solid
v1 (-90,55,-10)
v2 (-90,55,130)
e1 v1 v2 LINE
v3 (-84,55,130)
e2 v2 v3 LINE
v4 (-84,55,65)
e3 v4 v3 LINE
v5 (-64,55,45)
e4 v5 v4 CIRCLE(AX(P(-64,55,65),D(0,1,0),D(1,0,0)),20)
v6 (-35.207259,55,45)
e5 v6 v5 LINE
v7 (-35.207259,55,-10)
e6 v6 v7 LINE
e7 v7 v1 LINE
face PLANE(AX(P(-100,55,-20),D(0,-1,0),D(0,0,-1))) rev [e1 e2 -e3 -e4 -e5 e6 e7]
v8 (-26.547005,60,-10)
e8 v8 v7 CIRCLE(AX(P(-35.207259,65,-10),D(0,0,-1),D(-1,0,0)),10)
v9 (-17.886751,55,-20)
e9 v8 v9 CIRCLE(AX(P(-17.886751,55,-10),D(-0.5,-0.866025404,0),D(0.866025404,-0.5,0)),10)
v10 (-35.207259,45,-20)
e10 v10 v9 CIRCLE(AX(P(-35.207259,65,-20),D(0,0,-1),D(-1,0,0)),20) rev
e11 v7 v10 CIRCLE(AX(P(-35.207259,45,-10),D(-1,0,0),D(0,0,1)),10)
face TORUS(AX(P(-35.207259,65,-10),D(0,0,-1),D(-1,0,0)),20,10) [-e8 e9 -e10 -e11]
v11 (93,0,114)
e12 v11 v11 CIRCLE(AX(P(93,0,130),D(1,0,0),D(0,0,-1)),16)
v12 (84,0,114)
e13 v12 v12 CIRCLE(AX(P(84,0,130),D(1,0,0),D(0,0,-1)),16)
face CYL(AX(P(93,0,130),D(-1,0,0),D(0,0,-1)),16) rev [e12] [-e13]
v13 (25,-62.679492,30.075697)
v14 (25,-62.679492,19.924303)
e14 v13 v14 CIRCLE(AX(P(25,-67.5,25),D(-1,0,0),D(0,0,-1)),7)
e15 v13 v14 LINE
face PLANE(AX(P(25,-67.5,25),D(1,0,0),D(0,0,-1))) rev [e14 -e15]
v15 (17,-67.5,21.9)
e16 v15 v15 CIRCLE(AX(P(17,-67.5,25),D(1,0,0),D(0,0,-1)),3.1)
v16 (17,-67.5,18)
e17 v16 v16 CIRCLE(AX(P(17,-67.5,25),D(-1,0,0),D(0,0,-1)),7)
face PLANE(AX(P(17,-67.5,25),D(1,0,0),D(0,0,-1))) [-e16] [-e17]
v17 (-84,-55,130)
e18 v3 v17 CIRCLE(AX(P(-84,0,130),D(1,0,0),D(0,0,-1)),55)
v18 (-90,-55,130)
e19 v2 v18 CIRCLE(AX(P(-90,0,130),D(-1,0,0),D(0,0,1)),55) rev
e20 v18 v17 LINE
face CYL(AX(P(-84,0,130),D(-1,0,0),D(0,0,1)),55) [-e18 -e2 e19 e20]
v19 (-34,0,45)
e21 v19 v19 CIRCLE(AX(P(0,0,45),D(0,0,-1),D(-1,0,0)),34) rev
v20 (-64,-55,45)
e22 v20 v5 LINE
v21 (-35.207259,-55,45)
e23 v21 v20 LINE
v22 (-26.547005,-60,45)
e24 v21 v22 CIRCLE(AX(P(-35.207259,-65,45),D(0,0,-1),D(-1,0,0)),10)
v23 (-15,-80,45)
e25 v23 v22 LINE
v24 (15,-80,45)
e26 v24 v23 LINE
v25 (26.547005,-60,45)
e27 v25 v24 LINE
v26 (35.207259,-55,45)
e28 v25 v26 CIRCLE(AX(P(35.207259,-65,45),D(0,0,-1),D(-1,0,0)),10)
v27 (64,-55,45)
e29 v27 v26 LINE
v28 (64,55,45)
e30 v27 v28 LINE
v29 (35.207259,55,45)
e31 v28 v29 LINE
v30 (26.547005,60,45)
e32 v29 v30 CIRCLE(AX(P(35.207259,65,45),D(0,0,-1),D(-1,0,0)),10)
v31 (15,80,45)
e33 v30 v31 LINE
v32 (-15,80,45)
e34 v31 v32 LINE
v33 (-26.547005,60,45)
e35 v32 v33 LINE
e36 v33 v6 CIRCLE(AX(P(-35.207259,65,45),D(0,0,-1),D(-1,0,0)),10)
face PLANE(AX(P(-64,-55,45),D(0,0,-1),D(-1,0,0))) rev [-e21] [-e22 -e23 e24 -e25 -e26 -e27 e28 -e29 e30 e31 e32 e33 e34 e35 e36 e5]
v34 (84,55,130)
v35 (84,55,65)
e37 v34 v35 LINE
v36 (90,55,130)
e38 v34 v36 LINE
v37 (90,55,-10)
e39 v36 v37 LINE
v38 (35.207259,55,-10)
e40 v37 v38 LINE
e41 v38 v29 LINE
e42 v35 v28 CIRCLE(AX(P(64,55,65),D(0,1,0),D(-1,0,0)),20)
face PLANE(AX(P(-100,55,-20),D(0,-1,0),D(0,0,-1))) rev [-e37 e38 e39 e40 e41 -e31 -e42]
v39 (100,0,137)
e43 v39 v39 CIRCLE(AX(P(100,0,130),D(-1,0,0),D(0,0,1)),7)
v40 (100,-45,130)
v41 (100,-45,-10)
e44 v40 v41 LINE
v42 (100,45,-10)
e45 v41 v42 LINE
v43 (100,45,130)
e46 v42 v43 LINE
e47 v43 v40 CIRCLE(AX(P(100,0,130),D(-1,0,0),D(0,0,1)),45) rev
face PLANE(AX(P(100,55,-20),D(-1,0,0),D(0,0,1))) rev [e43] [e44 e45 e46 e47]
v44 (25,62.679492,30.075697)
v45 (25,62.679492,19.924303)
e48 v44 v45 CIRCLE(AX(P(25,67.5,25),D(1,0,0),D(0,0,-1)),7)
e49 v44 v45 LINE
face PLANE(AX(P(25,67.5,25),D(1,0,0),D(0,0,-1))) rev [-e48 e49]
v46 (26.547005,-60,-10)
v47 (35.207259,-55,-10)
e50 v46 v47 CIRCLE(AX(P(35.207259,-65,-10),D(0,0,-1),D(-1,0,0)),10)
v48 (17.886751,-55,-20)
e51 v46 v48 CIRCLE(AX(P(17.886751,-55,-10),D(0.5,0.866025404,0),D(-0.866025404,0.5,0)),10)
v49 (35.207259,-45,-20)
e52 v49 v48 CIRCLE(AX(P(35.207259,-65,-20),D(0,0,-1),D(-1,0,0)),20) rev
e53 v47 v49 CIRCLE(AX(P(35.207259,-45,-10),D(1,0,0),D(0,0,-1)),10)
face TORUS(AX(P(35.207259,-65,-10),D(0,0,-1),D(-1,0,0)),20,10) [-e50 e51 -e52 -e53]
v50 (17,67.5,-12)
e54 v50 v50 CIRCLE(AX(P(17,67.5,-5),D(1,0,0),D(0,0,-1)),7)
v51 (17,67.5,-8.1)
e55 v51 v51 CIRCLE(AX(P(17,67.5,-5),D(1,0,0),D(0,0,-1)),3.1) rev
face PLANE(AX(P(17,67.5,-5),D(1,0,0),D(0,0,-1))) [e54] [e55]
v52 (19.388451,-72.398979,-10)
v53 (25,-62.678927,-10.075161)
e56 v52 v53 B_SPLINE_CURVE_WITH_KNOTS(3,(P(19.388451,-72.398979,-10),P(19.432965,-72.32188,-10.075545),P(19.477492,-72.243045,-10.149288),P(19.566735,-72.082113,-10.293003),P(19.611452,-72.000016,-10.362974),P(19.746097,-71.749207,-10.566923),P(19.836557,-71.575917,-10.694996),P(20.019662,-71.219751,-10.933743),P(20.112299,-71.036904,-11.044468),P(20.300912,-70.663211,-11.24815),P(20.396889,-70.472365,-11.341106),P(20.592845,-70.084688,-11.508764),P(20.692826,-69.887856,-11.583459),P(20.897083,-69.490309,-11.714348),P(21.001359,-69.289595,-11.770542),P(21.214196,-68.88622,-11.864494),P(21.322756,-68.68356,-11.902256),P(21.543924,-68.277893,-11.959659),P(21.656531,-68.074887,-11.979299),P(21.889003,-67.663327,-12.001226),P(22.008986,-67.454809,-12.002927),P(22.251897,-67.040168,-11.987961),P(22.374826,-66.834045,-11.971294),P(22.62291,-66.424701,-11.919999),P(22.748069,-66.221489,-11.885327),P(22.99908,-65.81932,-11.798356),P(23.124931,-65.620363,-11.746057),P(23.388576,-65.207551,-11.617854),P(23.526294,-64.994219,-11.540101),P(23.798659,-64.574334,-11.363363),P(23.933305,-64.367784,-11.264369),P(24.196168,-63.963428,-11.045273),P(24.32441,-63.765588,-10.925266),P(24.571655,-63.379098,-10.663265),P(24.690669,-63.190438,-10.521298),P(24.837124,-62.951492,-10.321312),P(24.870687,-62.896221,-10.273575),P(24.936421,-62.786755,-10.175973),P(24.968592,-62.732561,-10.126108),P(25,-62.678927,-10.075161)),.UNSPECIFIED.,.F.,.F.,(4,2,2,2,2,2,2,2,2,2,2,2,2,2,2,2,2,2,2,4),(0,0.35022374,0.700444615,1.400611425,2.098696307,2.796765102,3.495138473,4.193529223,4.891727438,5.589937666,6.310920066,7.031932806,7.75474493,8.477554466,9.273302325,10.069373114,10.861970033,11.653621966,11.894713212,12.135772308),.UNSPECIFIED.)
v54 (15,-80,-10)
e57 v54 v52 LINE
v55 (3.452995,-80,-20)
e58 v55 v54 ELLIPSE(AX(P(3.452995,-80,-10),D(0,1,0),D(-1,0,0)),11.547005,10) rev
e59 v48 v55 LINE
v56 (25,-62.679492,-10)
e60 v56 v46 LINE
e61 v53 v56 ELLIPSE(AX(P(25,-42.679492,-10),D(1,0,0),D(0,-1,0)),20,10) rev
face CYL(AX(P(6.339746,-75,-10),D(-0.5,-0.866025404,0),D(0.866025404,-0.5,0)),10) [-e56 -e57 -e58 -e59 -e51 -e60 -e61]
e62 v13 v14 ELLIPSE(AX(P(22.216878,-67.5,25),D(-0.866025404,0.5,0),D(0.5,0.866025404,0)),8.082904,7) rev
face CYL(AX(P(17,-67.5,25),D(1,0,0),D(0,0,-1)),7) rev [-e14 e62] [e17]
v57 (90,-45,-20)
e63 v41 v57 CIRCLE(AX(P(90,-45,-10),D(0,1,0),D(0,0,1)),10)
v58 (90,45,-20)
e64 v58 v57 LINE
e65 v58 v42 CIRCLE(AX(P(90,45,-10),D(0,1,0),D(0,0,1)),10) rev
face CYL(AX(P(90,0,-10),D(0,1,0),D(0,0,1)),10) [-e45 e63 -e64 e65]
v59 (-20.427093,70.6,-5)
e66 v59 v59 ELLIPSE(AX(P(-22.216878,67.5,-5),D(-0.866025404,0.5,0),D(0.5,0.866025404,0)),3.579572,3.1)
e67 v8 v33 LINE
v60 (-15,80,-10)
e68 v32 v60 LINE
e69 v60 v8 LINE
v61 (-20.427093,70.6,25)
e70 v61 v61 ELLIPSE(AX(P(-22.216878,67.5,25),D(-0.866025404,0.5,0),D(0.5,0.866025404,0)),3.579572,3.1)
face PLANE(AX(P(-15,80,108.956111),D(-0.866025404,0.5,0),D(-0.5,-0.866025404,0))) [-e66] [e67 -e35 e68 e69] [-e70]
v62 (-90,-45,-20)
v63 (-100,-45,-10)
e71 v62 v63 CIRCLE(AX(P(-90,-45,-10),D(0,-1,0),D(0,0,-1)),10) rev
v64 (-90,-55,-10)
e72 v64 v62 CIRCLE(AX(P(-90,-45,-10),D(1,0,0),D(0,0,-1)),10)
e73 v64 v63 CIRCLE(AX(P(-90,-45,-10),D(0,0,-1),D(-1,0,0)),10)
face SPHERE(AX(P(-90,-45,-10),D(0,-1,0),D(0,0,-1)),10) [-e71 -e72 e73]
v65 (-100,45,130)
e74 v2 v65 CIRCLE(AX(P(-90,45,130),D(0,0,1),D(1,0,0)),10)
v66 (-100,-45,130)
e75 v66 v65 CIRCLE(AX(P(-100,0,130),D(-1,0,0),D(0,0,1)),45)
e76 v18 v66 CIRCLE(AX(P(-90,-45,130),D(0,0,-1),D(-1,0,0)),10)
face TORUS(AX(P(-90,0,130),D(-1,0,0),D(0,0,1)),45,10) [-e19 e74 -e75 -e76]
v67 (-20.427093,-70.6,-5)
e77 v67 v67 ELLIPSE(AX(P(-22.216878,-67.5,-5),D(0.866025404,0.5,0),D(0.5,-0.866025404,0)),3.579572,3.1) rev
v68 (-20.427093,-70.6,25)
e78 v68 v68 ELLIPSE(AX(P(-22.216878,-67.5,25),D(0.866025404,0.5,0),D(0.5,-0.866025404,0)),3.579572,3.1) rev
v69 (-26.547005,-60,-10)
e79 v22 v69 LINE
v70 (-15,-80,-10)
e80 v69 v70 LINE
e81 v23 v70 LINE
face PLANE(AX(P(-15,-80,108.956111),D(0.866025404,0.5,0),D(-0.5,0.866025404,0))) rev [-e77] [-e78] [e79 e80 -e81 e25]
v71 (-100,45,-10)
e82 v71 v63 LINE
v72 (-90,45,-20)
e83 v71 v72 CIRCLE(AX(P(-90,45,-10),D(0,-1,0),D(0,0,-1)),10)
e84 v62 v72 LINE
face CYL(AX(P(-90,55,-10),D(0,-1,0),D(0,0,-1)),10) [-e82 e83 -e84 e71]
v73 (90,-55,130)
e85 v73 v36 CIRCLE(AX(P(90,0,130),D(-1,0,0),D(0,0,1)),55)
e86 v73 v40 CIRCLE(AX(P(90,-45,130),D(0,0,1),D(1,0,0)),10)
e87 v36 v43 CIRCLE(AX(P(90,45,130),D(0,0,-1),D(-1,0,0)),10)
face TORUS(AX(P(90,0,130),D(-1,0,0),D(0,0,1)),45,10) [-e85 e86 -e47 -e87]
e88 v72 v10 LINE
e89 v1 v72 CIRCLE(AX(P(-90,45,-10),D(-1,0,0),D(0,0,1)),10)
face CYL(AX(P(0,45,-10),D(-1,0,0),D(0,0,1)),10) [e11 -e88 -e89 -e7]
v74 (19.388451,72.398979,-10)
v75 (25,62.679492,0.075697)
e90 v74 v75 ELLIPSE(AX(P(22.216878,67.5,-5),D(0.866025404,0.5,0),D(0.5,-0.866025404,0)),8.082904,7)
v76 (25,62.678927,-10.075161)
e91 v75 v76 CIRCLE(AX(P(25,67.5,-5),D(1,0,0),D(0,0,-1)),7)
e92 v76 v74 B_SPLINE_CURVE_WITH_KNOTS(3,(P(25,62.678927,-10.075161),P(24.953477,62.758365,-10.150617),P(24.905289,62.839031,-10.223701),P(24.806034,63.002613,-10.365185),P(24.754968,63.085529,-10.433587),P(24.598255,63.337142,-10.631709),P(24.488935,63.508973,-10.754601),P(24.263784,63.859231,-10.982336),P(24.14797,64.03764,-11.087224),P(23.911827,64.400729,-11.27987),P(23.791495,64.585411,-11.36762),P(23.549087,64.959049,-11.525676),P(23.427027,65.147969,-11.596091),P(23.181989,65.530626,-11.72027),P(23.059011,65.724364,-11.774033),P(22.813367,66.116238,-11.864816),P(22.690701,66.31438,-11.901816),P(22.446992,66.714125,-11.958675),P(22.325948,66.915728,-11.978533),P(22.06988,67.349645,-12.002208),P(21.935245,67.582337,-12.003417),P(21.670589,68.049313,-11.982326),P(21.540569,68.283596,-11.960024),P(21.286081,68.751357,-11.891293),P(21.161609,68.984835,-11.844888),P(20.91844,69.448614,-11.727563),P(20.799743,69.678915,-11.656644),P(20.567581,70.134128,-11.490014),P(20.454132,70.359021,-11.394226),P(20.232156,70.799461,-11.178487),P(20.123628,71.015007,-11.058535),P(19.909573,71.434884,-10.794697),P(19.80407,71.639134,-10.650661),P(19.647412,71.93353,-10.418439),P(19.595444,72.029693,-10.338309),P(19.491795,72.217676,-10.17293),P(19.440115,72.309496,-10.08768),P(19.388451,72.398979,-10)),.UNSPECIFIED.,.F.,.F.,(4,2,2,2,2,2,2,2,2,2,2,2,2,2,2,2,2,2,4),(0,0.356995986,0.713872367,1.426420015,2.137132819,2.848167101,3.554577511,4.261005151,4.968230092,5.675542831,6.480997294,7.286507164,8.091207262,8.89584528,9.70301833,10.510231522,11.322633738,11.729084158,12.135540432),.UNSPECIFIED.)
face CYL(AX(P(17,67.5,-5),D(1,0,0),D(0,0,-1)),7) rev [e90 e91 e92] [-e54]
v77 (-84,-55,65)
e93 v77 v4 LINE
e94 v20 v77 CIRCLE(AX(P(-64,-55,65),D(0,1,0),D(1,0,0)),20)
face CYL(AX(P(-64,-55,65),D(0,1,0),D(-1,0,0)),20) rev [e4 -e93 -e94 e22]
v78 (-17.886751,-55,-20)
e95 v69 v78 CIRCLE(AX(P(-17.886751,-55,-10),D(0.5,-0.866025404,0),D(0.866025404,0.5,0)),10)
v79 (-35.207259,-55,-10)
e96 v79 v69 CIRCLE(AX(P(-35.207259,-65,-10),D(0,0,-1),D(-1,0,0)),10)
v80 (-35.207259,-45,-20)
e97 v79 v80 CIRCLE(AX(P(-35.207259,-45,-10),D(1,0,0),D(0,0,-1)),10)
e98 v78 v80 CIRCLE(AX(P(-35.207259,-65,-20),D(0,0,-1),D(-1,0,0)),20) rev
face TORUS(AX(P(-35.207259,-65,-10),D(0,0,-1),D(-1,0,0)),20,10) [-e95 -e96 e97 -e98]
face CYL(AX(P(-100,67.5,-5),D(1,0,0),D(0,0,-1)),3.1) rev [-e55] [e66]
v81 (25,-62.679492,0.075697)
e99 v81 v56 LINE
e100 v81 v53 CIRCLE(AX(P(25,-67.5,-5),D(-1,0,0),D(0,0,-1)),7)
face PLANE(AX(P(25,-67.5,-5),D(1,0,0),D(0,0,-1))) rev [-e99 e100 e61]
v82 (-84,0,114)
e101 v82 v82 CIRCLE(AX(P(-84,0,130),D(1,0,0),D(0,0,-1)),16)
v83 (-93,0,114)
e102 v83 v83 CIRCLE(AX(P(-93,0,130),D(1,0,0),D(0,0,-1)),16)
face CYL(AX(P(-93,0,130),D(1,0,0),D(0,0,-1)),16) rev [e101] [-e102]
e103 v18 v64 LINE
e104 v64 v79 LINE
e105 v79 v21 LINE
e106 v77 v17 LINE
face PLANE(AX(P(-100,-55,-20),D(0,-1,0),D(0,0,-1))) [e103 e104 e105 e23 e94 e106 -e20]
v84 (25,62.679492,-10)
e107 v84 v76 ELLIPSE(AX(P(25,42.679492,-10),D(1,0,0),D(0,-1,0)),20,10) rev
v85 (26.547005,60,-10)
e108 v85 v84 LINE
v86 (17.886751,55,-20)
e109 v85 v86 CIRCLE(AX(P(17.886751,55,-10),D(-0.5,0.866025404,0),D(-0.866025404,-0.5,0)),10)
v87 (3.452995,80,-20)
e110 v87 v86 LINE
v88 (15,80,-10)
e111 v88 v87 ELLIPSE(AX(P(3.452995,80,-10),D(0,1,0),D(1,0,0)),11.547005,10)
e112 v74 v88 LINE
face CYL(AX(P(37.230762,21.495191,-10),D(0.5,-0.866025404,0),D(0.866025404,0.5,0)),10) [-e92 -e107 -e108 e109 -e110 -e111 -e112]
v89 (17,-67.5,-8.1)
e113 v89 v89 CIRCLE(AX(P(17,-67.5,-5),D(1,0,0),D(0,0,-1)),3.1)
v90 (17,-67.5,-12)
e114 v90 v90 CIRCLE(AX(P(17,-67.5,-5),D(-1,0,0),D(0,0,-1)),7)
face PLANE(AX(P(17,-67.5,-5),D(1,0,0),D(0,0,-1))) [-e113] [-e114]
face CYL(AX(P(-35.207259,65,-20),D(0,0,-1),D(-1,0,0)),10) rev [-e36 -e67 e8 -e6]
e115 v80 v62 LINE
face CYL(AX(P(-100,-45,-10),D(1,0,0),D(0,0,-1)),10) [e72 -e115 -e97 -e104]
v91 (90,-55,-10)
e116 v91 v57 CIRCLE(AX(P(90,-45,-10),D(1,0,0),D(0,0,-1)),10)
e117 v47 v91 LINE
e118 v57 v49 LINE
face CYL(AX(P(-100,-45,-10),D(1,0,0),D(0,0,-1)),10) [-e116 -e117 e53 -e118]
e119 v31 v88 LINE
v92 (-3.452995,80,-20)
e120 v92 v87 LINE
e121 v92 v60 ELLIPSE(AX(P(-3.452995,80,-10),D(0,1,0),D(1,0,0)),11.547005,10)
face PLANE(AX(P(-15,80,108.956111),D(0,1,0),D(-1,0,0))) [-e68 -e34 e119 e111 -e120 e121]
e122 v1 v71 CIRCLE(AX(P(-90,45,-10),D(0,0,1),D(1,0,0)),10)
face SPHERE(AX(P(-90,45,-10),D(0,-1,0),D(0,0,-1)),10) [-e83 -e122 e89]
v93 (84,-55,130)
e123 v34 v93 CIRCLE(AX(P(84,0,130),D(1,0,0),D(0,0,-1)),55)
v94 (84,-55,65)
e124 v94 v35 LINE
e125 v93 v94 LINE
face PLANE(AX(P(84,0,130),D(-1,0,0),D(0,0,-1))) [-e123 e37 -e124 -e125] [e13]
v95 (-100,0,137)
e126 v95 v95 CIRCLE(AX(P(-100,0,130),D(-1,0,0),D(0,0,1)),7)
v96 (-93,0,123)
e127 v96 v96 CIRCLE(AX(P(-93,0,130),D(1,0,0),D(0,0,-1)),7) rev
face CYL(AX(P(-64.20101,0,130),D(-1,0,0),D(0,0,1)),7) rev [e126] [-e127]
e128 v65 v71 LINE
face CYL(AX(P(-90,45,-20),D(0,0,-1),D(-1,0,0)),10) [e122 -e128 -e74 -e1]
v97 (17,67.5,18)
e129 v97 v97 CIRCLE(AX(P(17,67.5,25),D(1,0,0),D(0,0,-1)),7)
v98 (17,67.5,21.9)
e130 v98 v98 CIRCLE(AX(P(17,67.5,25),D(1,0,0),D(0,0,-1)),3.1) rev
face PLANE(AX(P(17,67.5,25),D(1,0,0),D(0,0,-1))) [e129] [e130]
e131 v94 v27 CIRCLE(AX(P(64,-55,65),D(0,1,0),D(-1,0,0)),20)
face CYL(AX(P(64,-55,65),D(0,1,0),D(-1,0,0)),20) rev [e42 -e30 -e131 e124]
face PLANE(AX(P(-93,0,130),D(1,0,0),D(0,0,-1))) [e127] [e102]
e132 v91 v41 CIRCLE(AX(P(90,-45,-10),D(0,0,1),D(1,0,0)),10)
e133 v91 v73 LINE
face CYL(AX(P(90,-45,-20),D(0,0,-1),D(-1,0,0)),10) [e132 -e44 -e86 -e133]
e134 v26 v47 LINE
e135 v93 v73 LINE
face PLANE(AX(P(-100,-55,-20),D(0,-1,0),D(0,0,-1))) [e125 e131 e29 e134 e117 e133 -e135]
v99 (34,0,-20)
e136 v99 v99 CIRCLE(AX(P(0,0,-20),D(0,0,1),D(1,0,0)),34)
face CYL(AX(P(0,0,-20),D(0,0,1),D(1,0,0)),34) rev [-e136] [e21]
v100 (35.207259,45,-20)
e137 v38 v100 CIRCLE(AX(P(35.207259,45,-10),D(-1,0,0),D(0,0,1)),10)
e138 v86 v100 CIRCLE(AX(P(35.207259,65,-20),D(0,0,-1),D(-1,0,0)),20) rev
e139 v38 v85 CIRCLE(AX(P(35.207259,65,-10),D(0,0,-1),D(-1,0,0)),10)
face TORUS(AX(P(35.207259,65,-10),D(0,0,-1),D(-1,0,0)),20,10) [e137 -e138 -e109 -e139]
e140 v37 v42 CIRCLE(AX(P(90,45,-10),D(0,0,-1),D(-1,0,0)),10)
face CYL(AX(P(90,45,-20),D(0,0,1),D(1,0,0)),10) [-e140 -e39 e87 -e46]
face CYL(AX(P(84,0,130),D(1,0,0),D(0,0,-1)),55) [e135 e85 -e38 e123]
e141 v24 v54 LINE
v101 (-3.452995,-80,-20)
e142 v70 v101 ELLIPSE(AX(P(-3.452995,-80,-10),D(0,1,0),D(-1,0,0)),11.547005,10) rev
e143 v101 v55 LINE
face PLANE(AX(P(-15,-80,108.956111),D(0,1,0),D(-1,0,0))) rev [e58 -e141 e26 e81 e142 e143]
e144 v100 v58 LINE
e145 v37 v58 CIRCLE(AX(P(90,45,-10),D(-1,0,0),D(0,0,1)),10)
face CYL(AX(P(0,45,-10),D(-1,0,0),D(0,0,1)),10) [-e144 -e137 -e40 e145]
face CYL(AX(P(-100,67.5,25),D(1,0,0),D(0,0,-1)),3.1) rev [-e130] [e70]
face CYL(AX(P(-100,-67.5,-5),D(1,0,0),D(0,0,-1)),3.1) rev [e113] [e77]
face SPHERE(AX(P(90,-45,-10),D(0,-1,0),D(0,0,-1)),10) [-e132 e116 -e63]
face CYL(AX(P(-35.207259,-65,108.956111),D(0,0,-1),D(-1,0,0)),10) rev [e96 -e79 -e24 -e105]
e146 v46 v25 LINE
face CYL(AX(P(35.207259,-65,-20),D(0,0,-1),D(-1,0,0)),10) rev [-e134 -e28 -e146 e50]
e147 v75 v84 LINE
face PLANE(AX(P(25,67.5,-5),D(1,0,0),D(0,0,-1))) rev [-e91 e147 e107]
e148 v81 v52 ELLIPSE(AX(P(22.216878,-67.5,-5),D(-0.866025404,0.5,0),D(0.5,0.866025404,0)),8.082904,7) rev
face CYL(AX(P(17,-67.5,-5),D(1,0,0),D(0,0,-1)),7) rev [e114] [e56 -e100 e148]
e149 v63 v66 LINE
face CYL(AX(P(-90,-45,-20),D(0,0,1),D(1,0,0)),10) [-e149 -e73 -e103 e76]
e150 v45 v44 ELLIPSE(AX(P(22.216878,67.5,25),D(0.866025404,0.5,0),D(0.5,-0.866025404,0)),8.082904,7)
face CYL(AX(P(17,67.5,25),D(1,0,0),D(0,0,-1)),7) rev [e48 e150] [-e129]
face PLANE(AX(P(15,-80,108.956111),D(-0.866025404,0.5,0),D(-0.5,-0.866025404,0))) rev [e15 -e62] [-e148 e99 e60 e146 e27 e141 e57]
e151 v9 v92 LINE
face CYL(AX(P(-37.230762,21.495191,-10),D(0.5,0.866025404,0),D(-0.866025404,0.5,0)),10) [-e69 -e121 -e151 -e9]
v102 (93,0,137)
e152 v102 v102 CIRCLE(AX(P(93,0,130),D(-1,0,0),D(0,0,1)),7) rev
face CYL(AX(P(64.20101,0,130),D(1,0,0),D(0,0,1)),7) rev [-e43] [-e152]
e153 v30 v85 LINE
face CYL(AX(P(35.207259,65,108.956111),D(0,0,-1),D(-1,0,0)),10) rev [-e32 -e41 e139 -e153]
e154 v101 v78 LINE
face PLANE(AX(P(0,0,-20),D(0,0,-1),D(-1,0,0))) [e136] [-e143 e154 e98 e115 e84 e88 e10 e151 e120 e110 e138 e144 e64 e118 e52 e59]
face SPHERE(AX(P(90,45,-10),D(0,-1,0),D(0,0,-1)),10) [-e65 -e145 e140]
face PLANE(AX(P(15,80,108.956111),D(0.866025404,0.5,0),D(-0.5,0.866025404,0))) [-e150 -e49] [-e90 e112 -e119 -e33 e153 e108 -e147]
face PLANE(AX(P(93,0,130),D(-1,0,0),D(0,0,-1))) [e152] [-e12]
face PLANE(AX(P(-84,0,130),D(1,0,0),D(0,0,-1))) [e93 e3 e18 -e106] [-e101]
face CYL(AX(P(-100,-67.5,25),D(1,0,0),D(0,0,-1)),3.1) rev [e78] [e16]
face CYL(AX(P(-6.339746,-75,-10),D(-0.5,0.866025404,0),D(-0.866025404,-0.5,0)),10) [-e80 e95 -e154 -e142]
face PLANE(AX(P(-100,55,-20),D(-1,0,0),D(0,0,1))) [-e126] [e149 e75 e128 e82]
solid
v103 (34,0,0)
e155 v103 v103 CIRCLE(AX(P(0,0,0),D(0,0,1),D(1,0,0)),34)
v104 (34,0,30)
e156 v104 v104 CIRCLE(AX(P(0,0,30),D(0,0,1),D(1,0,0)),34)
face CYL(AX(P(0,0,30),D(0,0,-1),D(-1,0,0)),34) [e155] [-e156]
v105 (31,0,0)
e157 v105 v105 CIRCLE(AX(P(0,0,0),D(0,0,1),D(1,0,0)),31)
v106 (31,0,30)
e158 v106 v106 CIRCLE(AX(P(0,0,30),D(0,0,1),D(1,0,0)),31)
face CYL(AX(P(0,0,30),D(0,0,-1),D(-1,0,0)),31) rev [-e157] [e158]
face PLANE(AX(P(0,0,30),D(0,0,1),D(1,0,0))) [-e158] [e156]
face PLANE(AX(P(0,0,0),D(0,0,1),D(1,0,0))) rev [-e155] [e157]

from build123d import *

# Parameters (mm, degrees)
SKETCH1_R                 = 34
SKETCH1_R_2               = 31
CENTRE_HOLE_FOR_L2_DEPTH  = 30
MAIN_STRUCTURE_DEPTH      = 100
MAIN_STRUCTURE_DEPTH_BACK = 50
SKETCH2_W                 = 200
SKETCH2_H                 = 110
SKETCH2_R                 = 34
BEARING_CURVE_DEPTH       = 16
SKETCH6_R                 = 7
CUT_EXTRUDE2_DEPTH        = 16
WRIST_CUTOUT_DEPTH        = 238.328885726
SKETCH9_R                 = 16
CUT_EXTRUDE3_DEPTH        = 9
FILLET2_R                 = 10
BOSS_EXTRUDE4_DEPTH       = 65
SKETCH11_R                = 3.1
CUT_EXTRUDE6_DEPTH        = 226
CUT_EXTRUDE8_START        = 25
SKETCH13_R                = 7
CUT_EXTRUDE8_DEPTH        = 8
FILLET3_R                 = 10
FILLET1_R                 = 10


with BuildPart() as part:
    # Sketch1 → Centre Hole for L2 (new body)
    with BuildSketch(Plane.XY):
        Circle(SKETCH1_R)
        Circle(SKETCH1_R_2, mode=Mode.SUBTRACT)
    extrude(amount=CENTRE_HOLE_FOR_L2_DEPTH)


with BuildPart() as body_2:
    # Sketch2 → Main Structure (new, two sides: drawn at the far end of the back side and taken through both)
    with BuildSketch(Plane.XY.offset(30).offset(-MAIN_STRUCTURE_DEPTH_BACK)):
        Rectangle(SKETCH2_W, SKETCH2_H)
        Circle(SKETCH2_R, mode=Mode.SUBTRACT)
    extrude(amount=MAIN_STRUCTURE_DEPTH + MAIN_STRUCTURE_DEPTH_BACK)

    # Sketch3 → Bearing Curve (add)
    with BuildSketch(Plane.ZY.offset(100)):
        with BuildLine():
            Line((130, 55), (130, -55))
            ThreePointArc((130, -55), (185, 0), (130, 55))
        make_face()
    bearing_curve = extrude(amount=-BEARING_CURVE_DEPTH)

    # Mirror7: Bearing Curve across plane
    add(bearing_curve.mirror(Plane(origin=(0, 0, 0), x_dir=(0, 0, 1), z_dir=(1, 0, 0))))

    # Sketch6 → Cut-Extrude2 (cut)
    with BuildSketch(Plane.ZY.offset(100)):
        with Locations((130, 0)):
            Circle(SKETCH6_R)
    cut_extrude2 = extrude(amount=-CUT_EXTRUDE2_DEPTH, mode=Mode.SUBTRACT)

    # Sketch4 → Wrist Cutout (cut, through all)
    with BuildSketch(Plane(origin=(0, 55, 0), x_dir=(1, 0, 0), z_dir=(0, 1, 0))):
        with BuildLine():
            Line((-84, -130), (-84, -65))
            ThreePointArc((-84, -65), (-78.142135624, -50.857864376), (-64, -45))
            Line((-64, -45), (64, -45))
            ThreePointArc((64, -45), (78.142135624, -50.857864376), (84, -65))
            Line((84, -65), (84, -130))
            Line((84, -130), (-84, -130))
        make_face()
    extrude(amount=-WRIST_CUTOUT_DEPTH, mode=Mode.SUBTRACT)

    # Sketch9 → Cut-Extrude3 (cut)
    with BuildSketch(Plane(origin=(-84, 0, 0), x_dir=(0, 0, -1), z_dir=(1, 0, 0))):
        with Locations((-130, 0)):
            Circle(SKETCH9_R)
    cut_extrude3 = extrude(amount=-CUT_EXTRUDE3_DEPTH, mode=Mode.SUBTRACT)

    # Mirror6: Cut-Extrude2, Cut-Extrude3 across plane
    add(cut_extrude2.mirror(Plane(origin=(0, 0, 0), x_dir=(0, 0, 1), z_dir=(1, 0, 0))), mode=Mode.SUBTRACT)
    add(cut_extrude3.mirror(Plane(origin=(0, 0, 0), x_dir=(0, 0, 1), z_dir=(1, 0, 0))), mode=Mode.SUBTRACT)

    # Fillet2
    fillet2_edges = [body_2.edges().sort_by_distance(p)[0] for p in [
        (-100, 0, -20),
        (100, 0, -20),
    ]]
    fillet(fillet2_edges, radius=FILLET2_R)

    # Sketch10 → Boss-Extrude4 (add)
    with BuildSketch(Plane(origin=(0, 0, -20), x_dir=(-1, 0, 0), z_dir=(0, 0, -1))):
        Polygon((15, 80), (-15, 80), (-29.43375673, 55), (29.43375673, 55), align=None)
    boss_extrude4 = extrude(amount=-BOSS_EXTRUDE4_DEPTH)

    # Sketch11 → Cut-Extrude6 (cut, symmetric)
    with BuildSketch(Plane(origin=(0, 0, 0), x_dir=(0, 0, -1), z_dir=(1, 0, 0))):
        with Locations(Location((5, 67.5, 0), (0, 0, 90))):
            Circle(SKETCH11_R)
        with Locations(Location((-25, 67.5, 0), (0, 0, 90))):
            Circle(SKETCH11_R)
    cut_extrude6 = extrude(amount=CUT_EXTRUDE6_DEPTH, both=True, mode=Mode.SUBTRACT)

    # Sketch13 → Cut-Extrude8 (cut)
    with BuildSketch(Plane(origin=(0, 0, 0), x_dir=(0, 0, -1), z_dir=(1, 0, 0)).offset(CUT_EXTRUDE8_START)):
        with Locations((5, 67.5)):
            Circle(SKETCH13_R)
        with Locations((-25, 67.5)):
            Circle(SKETCH13_R)
    cut_extrude8 = extrude(amount=-CUT_EXTRUDE8_DEPTH, mode=Mode.SUBTRACT)

    # Mirror8: Boss-Extrude4, Cut-Extrude6, Cut-Extrude8 across plane
    add(boss_extrude4.mirror(Plane.ZX))
    add(cut_extrude6.mirror(Plane.ZX), mode=Mode.SUBTRACT)
    add(cut_extrude8.mirror(Plane.ZX), mode=Mode.SUBTRACT)

    # Fillet3
    fillet3_edges = [body_2.edges().sort_by_distance(p)[0] for p in [
        (-29.43375673, 55, 12.5),
        (29.43375673, 55, 12.5),
        (29.43375673, -55, 12.5),
        (-29.43375673, -55, 12.5),
    ]]
    fillet(fillet3_edges, radius=FILLET3_R)

    # Fillet1
    # the kernel refuses this fillet: 10 mm, written as the material it takes off along each edge
    with BuildSketch(Plane(origin=(-100, 55, 130), x_dir=(1, 0, 0), z_dir=(0, 0, -1))) as fillet1_piece_1:
        with BuildLine():
            CenterArc((FILLET1_R, FILLET1_R), FILLET1_R, 180, 90)
            Line((0, FILLET1_R), (0, 0))
            Line((0, 0), (FILLET1_R, 0))
        make_face()
    extrude(amount=140, mode=Mode.SUBTRACT)
    with BuildSketch(Plane(origin=(-100, -55, -10), x_dir=(0, 1, 0), z_dir=(0, 0, 1)), Plane(origin=(100, -55, -10), x_dir=(-1, 0, 0), z_dir=(0, 0, 1)), Plane(origin=(100, 55, 130), x_dir=(-1, 0, 0), z_dir=(0, 0, -1))) as fillet1_piece_2:
        with BuildLine():
            CenterArc((FILLET1_R, -FILLET1_R), FILLET1_R, 90, 90)
            Line((0, -FILLET1_R), (0, 0))
            Line((0, 0), (FILLET1_R, 0))
        make_face()
    extrude(amount=140, mode=Mode.SUBTRACT)
    with BuildSketch(Plane(origin=(-100, 0, 130), x_dir=(0, -1, 0), z_dir=(0, 0, -1))) as fillet1_piece_3:
        with BuildLine():
            CenterArc((55 - FILLET1_R, -FILLET1_R), FILLET1_R, 0, 90)
            Line((55, -FILLET1_R), (55, 0))
            Line((55, 0), (55 - FILLET1_R, 0))
        make_face()
    revolve(axis=Axis((-100, 0, 130), (-1, 0, 0)), revolution_arc=180, mode=Mode.SUBTRACT)
    with BuildSketch(Plane(origin=(-26.547005384, -60, -20), x_dir=(0.8660254037844384, 0.5000000000000004, 0), z_dir=(0.5000000000000004, -0.8660254037844384, 0)), Plane(origin=(2.5, -101.650635095, -20), x_dir=(-0.8660254037844399, 0.49999999999999767, 0), z_dir=(0.4999999999999977, 0.86602540378444, 0))) as fillet1_piece_4:
        with BuildLine():
            CenterArc((FILLET1_R, FILLET1_R), FILLET1_R, 180, 90)
            Line((0, FILLET1_R), (0, 0))
            Line((0, 0), (FILLET1_R, 0))
        make_face()
    extrude(amount=48.094010768, mode=Mode.SUBTRACT)
    with BuildSketch(Plane(origin=(-35.207259422, -65, -20), x_dir=(0, 1, 0), z_dir=(-1, 0, 0))) as fillet1_piece_5:
        with BuildLine():
            CenterArc((10 + FILLET1_R, -FILLET1_R), FILLET1_R, 90, 90)
            Line((10, -FILLET1_R), (10, 0))
            Line((10, 0), (10 + FILLET1_R, 0))
        make_face()
    revolve(axis=Axis((-35.207259422, -65, -20), (0, 0, -1)), revolution_arc=60, mode=Mode.SUBTRACT)
    with BuildSketch(Plane(origin=(-90, -55, -20), x_dir=(0, 1, 0), z_dir=(1, 0, 0)), Plane(origin=(90, 55, -20), x_dir=(0, -1, 0), z_dir=(-1, 0, 0)), Plane(origin=(35.207259422, -55, -20), x_dir=(0, 1, 0), z_dir=(1, 0, 0))) as fillet1_piece_6:
        with BuildLine():
            CenterArc((FILLET1_R, FILLET1_R), FILLET1_R, 180, 90)
            Line((0, FILLET1_R), (0, 0))
            Line((0, 0), (FILLET1_R, 0))
        make_face()
    extrude(amount=54.792740578, mode=Mode.SUBTRACT)
    with BuildSketch(Plane(origin=(-90, -55, -10), x_dir=(-1, 0, 0), z_dir=(0, 0, 1))) as fillet1_piece_7:
        with BuildLine():
            CenterArc((10 - FILLET1_R, -FILLET1_R), FILLET1_R, 0, 90)
            Line((10 - FILLET1_R, 0), (10, 0))
            Line((10, 0), (10, -FILLET1_R))
        make_face()
    revolve(axis=Axis((-90, -55, -10), (0, -1, 0)), revolution_arc=90, mode=Mode.SUBTRACT)
    with BuildSketch(Plane(origin=(-26.547005384, 60, -20), x_dir=(0.8660254037844384, -0.5000000000000004, 0), z_dir=(0.5000000000000004, 0.8660254037844384, 0)), Plane(origin=(2.5, 101.650635095, -20), x_dir=(-0.8660254037844399, -0.49999999999999767, 0), z_dir=(0.4999999999999977, -0.86602540378444, 0))) as fillet1_piece_8:
        with BuildLine():
            CenterArc((FILLET1_R, -FILLET1_R), FILLET1_R, 90, 90)
            Line((0, -FILLET1_R), (0, 0))
            Line((0, 0), (FILLET1_R, 0))
        make_face()
    extrude(amount=48.094010768, mode=Mode.SUBTRACT)
    with BuildSketch(Plane(origin=(-35.207259422, 65, -20), x_dir=(0, -1, 0), z_dir=(-1, 0, 0))) as fillet1_piece_9:
        with BuildLine():
            CenterArc((10 + FILLET1_R, FILLET1_R), FILLET1_R, 180, 90)
            Line((10, FILLET1_R), (10, 0))
            Line((10, 0), (10 + FILLET1_R, 0))
        make_face()
    revolve(axis=Axis((-35.207259422, 65, -20), (0, 0, 1)), revolution_arc=60, mode=Mode.SUBTRACT)
    with BuildSketch(Plane(origin=(-35.207259422, 55, -20), x_dir=(0, 0, 1), z_dir=(-1, 0, 0))) as fillet1_piece_10:
        with BuildLine():
            CenterArc((FILLET1_R, -FILLET1_R), FILLET1_R, 90, 90)
            Line((0, -FILLET1_R), (0, 0))
            Line((0, 0), (FILLET1_R, 0))
        make_face()
    extrude(amount=54.792740578, mode=Mode.SUBTRACT)
    with BuildSketch(Plane(origin=(-90, 55, -10), x_dir=(-1, 0, 0), z_dir=(0, 0, 1))) as fillet1_piece_11:
        with BuildLine():
            CenterArc((10 - FILLET1_R, FILLET1_R), FILLET1_R, 270, 90)
            Line((10, FILLET1_R), (10, 0))
            Line((10, 0), (10 - FILLET1_R, 0))
        make_face()
    revolve(axis=Axis((-90, 55, -10), (0, -1, 0)), revolution_arc=90, mode=Mode.SUBTRACT)
    with BuildSketch(Plane(origin=(35.207259422, 65, -20), x_dir=(0, -1, 0), z_dir=(1, 0, 0))) as fillet1_piece_12:
        with BuildLine():
            CenterArc((10 + FILLET1_R, -FILLET1_R), FILLET1_R, 90, 90)
            Line((10, -FILLET1_R), (10, 0))
            Line((10, 0), (10 + FILLET1_R, 0))
        make_face()
    revolve(axis=Axis((35.207259422, 65, -20), (0, 0, -1)), revolution_arc=60, mode=Mode.SUBTRACT)
    with BuildSketch(Plane(origin=(90, 55, -10), x_dir=(0, 0, -1), z_dir=(-1, 0, 0))) as fillet1_piece_13:
        with BuildLine():
            CenterArc((10 - FILLET1_R, FILLET1_R), FILLET1_R, 270, 90)
            Line((10 - FILLET1_R, 0), (10, 0))
            Line((10, 0), (10, FILLET1_R))
        make_face()
    revolve(axis=Axis((90, 55, -10), (0, -1, 0)), revolution_arc=90, mode=Mode.SUBTRACT)
    with BuildSketch(Plane(origin=(35.207259422, -65, -20), x_dir=(-0.8660254037844398, 0.49999999999999795, 0), z_dir=(-0.49999999999999795, -0.8660254037844398, 0))) as fillet1_piece_14:
        with BuildLine():
            CenterArc((10 + FILLET1_R, -FILLET1_R), FILLET1_R, 90, 90)
            Line((10, -FILLET1_R), (10, 0))
            Line((10, 0), (10 + FILLET1_R, 0))
        make_face()
    revolve(axis=Axis((35.207259422, -65, -20), (0, 0, -1)), revolution_arc=60, mode=Mode.SUBTRACT)
    with BuildSketch(Plane(origin=(90, -55, -10), x_dir=(0, 0, -1), z_dir=(-1, 0, 0))) as fillet1_piece_15:
        with BuildLine():
            CenterArc((10 - FILLET1_R, -FILLET1_R), FILLET1_R, 0, 90)
            Line((10, -FILLET1_R), (10, 0))
            Line((10, 0), (10 - FILLET1_R, 0))
        make_face()
    revolve(axis=Axis((90, -55, -10), (0, -1, 0)), revolution_arc=90, mode=Mode.SUBTRACT)
    with BuildSketch(Plane(origin=(100, 0, 130), x_dir=(0, -1, 0), z_dir=(0, 0, -1))) as fillet1_piece_16:
        with BuildLine():
            CenterArc((55 - FILLET1_R, FILLET1_R), FILLET1_R, 270, 90)
            Line((55, FILLET1_R), (55, 0))
            Line((55, 0), (55 - FILLET1_R, 0))
        make_face()
    revolve(axis=Axis((100, 0, 130), (-1, 0, 0)), revolution_arc=180, mode=Mode.SUBTRACT)


solid = Compound([part.part, body_2.part])
